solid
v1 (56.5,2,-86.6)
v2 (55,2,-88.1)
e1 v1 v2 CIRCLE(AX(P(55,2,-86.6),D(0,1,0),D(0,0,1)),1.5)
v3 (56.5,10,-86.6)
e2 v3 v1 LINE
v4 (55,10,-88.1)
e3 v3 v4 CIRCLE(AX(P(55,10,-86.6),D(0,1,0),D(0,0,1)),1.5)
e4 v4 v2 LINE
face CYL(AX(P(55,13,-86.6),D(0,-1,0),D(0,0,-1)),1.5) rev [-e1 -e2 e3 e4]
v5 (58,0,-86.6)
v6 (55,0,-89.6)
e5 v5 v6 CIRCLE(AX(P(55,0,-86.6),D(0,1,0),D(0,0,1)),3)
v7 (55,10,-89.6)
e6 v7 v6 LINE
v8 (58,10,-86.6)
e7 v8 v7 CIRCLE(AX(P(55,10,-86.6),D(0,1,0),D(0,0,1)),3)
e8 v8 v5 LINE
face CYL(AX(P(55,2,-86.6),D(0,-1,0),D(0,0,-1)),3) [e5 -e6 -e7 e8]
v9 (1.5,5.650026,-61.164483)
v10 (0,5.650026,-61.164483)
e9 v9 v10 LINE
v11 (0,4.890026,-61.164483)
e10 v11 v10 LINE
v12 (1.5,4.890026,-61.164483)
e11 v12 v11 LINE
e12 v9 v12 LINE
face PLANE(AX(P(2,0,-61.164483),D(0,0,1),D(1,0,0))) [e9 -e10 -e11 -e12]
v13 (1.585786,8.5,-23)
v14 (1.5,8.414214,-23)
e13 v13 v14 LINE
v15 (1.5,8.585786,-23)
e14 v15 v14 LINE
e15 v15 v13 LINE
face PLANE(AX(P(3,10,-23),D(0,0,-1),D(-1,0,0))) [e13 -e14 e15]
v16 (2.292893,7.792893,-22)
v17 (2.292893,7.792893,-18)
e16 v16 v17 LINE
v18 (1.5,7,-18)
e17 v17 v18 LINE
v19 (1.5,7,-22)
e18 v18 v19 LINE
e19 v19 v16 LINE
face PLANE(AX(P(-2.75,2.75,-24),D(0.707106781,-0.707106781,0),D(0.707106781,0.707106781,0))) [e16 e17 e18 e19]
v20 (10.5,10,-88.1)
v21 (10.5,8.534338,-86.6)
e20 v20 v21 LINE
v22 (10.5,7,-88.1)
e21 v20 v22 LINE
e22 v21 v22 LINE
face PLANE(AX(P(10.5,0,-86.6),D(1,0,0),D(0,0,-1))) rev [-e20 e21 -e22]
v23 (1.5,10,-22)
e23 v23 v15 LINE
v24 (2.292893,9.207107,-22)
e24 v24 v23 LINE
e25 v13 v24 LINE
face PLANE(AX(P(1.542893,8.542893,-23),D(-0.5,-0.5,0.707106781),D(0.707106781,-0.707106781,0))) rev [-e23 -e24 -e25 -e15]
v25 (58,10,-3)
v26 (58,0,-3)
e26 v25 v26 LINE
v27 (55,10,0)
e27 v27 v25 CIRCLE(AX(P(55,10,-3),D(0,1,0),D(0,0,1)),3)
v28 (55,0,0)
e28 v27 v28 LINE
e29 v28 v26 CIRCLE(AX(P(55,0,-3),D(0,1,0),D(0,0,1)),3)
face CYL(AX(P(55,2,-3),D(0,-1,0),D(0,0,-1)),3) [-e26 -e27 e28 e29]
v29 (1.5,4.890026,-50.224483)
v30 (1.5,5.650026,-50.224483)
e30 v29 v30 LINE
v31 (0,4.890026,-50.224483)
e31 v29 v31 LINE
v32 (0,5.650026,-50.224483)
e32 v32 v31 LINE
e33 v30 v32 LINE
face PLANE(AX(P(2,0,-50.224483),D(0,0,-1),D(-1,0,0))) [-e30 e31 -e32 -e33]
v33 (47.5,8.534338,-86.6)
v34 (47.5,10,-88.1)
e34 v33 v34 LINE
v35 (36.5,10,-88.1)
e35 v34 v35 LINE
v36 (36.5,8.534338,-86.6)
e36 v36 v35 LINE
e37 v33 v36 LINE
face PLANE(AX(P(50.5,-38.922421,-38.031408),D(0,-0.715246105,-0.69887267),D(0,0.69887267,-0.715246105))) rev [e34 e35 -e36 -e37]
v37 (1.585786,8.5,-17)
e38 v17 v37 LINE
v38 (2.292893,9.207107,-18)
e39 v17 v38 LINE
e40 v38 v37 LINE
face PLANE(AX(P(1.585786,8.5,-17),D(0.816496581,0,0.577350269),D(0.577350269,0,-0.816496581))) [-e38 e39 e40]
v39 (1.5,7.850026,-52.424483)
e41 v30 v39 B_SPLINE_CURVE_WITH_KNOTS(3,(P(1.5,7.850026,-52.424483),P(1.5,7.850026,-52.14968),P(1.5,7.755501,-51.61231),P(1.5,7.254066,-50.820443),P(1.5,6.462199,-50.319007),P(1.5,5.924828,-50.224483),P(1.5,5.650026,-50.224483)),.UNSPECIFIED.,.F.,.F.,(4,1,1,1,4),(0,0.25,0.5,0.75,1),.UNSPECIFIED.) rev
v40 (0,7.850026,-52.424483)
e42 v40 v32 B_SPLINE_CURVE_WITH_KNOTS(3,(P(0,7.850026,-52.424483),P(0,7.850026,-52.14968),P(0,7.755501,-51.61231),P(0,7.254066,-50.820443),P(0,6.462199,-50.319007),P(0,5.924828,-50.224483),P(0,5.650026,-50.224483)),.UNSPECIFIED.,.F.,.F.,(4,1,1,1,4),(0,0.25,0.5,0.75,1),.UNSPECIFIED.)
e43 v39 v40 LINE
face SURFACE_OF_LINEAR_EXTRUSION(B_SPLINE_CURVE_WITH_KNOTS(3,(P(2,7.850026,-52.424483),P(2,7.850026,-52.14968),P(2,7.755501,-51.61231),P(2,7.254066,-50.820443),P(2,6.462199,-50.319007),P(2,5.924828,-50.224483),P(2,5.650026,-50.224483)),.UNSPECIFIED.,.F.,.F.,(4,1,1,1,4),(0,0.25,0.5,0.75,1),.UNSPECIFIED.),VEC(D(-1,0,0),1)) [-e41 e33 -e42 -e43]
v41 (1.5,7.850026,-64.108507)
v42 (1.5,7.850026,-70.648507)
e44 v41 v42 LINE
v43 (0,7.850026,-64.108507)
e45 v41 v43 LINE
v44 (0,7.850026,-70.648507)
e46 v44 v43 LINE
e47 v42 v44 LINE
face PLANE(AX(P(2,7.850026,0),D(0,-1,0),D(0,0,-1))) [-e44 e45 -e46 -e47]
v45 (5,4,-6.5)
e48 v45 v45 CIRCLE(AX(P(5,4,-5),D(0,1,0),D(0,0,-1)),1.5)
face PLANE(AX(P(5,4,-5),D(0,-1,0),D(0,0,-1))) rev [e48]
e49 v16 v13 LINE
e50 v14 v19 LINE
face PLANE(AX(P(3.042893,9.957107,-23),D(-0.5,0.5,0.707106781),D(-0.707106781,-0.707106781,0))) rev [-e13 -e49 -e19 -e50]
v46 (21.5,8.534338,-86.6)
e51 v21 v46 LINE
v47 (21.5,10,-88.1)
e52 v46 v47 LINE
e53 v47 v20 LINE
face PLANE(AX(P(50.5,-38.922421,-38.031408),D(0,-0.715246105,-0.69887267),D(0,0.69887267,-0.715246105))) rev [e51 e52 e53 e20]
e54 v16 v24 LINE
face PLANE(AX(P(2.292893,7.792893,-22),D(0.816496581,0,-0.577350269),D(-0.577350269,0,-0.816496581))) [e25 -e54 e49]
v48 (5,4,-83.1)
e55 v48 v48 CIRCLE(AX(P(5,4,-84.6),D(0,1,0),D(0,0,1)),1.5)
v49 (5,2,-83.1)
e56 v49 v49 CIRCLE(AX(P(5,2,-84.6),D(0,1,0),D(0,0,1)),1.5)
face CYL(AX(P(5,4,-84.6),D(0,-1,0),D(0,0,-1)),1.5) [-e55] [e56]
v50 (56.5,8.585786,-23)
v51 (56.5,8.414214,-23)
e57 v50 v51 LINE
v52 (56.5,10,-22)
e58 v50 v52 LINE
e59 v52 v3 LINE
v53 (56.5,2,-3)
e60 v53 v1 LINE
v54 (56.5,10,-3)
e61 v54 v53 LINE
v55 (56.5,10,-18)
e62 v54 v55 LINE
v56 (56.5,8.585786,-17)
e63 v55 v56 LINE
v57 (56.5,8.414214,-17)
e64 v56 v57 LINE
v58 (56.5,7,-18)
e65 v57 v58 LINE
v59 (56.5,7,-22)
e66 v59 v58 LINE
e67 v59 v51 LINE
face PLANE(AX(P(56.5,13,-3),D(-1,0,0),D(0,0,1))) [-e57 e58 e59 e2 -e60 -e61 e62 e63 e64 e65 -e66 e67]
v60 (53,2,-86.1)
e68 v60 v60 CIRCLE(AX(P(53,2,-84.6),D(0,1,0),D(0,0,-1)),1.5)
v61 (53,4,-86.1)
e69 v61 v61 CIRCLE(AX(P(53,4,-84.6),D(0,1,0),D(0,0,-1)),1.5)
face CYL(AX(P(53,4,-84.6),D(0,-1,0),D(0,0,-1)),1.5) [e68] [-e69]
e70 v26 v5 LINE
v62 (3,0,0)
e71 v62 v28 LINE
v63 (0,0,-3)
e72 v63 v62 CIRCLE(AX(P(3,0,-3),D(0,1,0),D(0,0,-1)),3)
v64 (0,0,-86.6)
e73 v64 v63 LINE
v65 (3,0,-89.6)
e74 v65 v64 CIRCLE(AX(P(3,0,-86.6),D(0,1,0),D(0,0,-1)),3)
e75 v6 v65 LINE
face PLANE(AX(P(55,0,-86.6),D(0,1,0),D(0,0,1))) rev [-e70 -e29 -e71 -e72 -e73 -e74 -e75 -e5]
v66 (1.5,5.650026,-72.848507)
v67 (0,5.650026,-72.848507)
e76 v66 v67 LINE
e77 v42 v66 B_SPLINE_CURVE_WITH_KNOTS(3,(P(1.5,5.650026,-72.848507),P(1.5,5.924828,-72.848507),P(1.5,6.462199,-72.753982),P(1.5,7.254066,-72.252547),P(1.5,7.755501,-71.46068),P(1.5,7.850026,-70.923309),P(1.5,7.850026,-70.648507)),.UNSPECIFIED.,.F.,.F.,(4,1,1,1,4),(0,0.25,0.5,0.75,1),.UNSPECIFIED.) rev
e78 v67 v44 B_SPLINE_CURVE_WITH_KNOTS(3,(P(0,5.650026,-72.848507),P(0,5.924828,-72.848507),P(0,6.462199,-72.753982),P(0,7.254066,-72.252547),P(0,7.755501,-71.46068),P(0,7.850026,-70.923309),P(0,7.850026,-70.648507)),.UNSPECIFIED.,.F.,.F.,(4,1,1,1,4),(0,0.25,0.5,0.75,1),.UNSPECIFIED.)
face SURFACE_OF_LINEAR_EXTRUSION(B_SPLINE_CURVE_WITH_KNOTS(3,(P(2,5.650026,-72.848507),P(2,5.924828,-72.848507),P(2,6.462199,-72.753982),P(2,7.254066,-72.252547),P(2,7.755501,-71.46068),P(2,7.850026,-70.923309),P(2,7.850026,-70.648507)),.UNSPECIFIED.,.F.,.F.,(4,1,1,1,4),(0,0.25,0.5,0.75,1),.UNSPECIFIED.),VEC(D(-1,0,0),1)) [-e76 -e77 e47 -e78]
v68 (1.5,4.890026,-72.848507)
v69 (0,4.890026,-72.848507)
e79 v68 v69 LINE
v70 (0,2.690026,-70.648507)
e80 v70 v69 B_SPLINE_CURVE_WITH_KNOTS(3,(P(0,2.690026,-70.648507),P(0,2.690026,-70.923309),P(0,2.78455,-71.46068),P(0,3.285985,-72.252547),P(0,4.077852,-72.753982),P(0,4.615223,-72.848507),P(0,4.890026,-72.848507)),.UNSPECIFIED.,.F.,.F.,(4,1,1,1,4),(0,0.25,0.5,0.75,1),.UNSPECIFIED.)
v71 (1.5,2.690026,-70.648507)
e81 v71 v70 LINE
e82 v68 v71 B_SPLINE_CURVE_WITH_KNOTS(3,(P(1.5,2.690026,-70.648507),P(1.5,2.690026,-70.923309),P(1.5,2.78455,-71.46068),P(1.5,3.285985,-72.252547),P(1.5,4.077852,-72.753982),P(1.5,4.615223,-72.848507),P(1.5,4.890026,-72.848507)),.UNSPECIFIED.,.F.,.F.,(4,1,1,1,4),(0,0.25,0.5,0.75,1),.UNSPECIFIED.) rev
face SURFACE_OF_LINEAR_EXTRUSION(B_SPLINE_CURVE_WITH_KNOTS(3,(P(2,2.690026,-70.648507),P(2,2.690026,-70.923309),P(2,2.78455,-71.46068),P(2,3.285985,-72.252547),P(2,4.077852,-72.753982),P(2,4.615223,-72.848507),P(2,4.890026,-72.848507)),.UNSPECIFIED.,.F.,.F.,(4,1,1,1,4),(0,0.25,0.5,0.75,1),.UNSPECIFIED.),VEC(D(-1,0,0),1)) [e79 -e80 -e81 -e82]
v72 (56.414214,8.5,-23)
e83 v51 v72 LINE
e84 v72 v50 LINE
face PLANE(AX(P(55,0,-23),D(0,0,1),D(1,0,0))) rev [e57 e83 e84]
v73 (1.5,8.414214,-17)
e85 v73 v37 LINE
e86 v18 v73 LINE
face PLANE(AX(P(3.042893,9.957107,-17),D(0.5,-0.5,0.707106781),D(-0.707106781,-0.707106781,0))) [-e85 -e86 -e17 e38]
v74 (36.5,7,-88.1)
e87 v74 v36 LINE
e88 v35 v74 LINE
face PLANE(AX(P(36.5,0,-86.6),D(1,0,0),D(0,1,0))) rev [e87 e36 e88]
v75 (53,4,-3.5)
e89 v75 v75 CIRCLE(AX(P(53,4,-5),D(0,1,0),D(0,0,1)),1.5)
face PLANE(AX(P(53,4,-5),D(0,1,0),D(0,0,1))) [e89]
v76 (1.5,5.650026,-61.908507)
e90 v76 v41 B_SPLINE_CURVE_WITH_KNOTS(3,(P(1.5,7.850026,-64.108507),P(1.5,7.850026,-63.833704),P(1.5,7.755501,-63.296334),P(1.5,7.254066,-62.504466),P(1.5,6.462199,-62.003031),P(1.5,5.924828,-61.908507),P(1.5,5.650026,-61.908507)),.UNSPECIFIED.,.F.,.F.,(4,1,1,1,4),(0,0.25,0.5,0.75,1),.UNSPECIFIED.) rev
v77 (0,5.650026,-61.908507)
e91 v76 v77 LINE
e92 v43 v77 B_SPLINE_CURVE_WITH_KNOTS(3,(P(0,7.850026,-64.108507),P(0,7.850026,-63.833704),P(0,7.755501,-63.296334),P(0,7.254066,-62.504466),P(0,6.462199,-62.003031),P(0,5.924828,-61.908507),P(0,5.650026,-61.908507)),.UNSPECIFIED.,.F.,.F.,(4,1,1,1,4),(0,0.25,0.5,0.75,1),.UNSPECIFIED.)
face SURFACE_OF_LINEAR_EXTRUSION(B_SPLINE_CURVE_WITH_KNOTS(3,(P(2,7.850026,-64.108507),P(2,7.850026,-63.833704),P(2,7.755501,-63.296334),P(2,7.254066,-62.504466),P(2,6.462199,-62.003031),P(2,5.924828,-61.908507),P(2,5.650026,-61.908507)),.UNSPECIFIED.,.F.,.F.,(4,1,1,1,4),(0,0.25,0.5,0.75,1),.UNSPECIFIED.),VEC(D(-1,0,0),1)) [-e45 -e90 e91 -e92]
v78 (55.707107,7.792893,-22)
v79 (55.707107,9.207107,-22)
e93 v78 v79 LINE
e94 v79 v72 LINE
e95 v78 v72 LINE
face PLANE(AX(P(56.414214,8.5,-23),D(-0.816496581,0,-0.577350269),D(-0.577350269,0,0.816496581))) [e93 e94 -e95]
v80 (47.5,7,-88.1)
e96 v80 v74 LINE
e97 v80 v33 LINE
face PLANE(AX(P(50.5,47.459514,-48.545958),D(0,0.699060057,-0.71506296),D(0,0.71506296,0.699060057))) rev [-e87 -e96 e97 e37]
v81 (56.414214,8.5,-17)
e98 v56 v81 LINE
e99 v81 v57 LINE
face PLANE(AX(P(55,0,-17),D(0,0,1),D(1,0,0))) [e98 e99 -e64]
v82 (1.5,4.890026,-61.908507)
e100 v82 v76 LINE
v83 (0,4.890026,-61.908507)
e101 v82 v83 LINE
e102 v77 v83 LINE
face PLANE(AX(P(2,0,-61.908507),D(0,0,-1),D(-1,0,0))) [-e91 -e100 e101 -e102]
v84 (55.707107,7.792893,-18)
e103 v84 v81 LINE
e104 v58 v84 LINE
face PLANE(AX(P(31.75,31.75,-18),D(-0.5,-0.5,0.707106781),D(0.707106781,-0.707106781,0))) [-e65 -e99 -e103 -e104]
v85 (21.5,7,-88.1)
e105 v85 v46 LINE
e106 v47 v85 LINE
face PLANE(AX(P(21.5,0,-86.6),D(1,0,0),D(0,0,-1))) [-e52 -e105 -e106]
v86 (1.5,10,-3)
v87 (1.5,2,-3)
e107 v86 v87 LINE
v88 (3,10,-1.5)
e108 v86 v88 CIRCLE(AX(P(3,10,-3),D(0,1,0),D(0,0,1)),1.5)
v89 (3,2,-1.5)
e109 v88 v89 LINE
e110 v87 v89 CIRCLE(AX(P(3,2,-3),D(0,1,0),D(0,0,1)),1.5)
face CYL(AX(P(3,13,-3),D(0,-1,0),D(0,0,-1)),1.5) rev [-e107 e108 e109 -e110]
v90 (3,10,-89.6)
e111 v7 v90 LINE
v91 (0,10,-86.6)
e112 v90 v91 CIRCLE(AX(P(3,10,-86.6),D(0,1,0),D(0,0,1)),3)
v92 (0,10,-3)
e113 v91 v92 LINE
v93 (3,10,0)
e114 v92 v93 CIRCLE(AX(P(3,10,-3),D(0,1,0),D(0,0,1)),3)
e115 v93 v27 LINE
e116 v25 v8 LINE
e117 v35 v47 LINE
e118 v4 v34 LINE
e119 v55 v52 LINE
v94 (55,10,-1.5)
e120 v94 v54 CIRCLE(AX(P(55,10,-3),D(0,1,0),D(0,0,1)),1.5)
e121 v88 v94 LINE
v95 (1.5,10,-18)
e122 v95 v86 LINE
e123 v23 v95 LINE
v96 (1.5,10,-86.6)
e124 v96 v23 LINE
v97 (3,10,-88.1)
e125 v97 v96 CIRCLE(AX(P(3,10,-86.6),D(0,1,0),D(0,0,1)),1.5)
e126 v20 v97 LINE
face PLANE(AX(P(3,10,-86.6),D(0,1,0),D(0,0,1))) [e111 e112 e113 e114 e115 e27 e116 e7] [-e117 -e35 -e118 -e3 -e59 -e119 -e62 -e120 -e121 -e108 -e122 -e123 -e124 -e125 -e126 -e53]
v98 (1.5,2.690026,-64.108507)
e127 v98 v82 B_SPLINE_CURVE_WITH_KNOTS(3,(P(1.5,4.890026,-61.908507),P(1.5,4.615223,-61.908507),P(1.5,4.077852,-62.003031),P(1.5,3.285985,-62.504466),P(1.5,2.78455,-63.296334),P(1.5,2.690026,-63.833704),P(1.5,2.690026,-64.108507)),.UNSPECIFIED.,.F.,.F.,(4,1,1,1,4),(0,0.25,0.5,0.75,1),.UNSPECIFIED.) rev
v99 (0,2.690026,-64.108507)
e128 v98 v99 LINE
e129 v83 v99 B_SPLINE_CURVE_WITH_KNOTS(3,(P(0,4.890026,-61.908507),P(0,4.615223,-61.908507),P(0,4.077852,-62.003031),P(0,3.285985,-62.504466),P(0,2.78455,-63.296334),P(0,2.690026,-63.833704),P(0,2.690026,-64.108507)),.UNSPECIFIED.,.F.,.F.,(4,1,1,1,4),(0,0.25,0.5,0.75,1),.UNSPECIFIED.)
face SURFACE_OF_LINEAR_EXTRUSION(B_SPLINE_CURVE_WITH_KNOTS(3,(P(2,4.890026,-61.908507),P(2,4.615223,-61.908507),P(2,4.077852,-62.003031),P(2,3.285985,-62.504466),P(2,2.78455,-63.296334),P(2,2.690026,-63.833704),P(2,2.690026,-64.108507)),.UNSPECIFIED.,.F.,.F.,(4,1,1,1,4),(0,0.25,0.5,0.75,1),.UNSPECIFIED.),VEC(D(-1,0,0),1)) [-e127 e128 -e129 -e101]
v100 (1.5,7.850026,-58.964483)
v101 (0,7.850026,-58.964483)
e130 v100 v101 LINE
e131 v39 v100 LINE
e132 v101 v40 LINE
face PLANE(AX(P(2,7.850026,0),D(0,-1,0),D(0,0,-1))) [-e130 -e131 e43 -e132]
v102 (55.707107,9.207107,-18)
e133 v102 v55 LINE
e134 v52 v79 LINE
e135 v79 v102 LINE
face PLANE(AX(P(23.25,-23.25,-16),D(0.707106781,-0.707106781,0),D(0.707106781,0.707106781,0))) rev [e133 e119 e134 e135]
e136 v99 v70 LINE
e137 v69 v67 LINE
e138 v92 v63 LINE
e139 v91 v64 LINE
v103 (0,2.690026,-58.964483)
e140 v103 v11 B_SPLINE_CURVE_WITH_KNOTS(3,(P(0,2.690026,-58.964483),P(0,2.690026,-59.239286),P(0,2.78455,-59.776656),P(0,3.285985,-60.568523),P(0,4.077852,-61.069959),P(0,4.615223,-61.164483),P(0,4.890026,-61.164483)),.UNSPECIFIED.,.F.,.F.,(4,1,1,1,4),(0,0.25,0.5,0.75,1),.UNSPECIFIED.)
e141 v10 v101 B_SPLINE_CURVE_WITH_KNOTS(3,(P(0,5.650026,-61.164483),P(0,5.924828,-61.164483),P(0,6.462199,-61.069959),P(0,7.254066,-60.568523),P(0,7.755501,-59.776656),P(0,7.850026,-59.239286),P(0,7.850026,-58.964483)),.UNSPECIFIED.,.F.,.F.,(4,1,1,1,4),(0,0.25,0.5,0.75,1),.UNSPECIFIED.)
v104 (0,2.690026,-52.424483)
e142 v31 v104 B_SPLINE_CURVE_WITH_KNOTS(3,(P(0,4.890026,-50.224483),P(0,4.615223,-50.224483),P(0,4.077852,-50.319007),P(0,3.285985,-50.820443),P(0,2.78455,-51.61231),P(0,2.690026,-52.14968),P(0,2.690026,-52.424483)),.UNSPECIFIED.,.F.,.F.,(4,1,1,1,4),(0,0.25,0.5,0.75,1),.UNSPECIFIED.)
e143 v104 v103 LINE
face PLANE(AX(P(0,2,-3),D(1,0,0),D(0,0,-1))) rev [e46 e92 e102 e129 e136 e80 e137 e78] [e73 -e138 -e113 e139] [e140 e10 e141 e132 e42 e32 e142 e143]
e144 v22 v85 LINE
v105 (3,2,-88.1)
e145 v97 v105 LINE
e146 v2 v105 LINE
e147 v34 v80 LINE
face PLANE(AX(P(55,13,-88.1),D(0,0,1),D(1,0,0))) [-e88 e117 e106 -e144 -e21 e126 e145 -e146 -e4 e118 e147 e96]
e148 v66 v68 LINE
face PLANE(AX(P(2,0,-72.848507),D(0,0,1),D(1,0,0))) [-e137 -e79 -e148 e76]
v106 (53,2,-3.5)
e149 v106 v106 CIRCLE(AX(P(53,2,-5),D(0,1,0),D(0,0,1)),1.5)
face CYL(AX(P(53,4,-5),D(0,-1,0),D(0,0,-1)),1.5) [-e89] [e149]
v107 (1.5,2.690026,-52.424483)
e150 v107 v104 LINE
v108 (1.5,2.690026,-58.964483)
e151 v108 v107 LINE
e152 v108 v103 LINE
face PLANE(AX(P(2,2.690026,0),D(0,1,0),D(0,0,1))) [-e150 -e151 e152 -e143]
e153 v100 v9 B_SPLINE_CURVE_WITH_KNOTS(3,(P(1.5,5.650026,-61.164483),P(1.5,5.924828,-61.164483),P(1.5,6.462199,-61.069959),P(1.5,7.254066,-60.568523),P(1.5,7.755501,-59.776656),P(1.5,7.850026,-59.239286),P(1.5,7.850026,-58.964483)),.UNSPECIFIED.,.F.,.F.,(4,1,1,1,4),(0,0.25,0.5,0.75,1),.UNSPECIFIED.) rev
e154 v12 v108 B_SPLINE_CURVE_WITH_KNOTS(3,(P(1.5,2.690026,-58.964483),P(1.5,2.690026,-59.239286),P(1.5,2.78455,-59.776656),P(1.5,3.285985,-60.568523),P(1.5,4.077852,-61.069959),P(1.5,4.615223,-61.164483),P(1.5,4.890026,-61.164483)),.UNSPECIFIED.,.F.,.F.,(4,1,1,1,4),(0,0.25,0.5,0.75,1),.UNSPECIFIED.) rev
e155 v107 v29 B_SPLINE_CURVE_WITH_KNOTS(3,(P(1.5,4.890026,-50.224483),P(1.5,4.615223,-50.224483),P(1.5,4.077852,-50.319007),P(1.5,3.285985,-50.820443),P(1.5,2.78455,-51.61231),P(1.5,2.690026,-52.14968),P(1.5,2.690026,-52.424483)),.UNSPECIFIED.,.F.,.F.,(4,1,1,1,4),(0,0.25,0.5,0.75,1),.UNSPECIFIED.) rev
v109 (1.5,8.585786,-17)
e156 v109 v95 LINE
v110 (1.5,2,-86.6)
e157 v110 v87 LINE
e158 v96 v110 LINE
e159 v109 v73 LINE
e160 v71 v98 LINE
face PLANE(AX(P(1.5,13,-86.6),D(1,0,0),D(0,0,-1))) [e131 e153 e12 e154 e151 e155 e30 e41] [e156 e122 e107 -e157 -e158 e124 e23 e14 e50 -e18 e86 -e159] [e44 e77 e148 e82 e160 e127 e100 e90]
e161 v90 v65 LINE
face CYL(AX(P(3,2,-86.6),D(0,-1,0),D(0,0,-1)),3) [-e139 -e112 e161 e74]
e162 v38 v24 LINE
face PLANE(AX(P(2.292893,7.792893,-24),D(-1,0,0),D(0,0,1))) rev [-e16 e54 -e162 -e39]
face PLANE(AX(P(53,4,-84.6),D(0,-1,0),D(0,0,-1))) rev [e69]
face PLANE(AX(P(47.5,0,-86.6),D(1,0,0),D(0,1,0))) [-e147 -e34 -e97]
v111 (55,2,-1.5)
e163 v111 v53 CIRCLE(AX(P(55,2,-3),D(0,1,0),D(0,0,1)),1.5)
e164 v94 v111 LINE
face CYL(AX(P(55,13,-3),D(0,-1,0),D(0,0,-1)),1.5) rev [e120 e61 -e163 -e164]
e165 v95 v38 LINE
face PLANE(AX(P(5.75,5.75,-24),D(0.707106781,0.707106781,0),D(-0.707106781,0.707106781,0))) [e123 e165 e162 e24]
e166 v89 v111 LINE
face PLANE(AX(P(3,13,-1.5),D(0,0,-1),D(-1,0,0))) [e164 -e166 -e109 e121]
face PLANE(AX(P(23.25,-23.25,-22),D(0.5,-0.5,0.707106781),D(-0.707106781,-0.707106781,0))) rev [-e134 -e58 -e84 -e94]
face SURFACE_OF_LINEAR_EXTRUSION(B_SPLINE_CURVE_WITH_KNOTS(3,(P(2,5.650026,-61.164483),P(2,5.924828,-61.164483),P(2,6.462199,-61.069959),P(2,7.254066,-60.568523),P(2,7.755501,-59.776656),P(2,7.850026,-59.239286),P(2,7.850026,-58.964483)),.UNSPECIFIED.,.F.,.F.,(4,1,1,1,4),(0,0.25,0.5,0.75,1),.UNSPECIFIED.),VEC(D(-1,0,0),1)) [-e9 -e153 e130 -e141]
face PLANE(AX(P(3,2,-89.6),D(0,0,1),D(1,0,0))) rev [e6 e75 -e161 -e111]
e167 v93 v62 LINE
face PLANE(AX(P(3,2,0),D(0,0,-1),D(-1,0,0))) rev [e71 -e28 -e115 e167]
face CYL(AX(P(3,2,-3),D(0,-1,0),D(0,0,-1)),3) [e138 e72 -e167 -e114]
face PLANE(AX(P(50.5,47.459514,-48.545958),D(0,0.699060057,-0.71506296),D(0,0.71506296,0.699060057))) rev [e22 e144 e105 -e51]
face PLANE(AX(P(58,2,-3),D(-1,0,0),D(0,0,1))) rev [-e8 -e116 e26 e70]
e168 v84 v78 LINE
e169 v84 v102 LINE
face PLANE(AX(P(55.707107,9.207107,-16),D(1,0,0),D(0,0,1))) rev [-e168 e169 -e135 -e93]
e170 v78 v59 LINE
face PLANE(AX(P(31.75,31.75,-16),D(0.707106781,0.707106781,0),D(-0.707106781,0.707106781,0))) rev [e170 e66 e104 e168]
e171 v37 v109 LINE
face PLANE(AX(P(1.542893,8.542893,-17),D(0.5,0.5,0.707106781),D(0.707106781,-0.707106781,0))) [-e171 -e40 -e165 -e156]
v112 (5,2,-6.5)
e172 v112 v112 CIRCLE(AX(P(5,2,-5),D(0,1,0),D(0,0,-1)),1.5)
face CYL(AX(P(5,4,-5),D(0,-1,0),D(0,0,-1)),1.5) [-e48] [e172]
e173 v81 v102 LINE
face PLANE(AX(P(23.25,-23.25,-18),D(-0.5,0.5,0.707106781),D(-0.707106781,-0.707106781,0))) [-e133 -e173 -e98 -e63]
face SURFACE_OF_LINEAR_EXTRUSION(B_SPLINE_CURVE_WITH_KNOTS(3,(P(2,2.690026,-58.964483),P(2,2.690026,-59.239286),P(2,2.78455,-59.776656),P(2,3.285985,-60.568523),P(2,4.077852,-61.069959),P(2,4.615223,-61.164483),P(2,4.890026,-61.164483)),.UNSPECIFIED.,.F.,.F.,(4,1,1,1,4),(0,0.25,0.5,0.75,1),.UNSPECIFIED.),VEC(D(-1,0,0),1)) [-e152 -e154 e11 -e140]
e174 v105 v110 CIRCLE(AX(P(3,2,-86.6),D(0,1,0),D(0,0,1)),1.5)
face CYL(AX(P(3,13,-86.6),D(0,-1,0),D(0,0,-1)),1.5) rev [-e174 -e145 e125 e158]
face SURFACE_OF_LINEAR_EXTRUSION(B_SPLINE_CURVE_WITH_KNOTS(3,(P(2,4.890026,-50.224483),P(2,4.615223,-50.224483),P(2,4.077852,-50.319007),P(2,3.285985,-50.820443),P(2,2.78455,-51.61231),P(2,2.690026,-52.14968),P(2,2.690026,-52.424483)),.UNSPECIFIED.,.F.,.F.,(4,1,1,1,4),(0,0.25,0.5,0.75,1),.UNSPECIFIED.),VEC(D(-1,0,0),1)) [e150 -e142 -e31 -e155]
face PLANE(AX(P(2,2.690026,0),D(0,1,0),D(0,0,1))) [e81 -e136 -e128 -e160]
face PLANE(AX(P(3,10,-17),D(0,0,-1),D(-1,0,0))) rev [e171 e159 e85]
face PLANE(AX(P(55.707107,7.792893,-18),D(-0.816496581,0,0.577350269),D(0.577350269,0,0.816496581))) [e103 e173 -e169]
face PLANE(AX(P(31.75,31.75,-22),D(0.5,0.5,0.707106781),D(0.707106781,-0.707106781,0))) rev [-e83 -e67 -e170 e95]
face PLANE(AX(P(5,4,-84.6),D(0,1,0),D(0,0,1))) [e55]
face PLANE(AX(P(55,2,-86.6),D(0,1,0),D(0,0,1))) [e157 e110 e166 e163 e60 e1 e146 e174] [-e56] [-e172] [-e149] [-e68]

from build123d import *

# Parameters (mm, degrees)
EXTRUDE_1_DEPTH     = 2
EXTRUDE_2_DEPTH     = 11
SKETCH_5_R          = 1.5
EXTRUDE_3_DEPTH     = 2
CUT_EXTRUDE_START   = -3
CUT_EXTRUDE_2_DEPTH = 3
SKETCH_8_W          = 11
SKETCH_8_H          = 3
EXTRUDE_4_DEPTH     = 1.5
CUT_EXTRUDE_3_DEPTH = 40
SKETCH_11_W         = 6
SKETCH_11_H         = 3
EXTRUDE_5_DEPTH     = 1.5
CUT_EXTRUDE_4_DEPTH = 7
SKETCH_13_W         = 6
SKETCH_13_H         = 3
EXTRUDE_6_DEPTH     = 1.5
CUT_EXTRUDE_5_DEPTH = 7
CHAMFER_1_SIZE      = 1
CHAMFER_2_SIZE      = 1
CUT_EXTRUDE_6_DEPTH = 2


with BuildPart() as part:
    # 草图1 → 凸台-拉伸1 (new body)
    with BuildSketch(Plane(origin=(0, 0, 0), x_dir=(1, 0, 0), z_dir=(0, 1, 0))):
        with BuildLine():
            Line((3, 0), (55, 0))
            ThreePointArc((55, 0), (57.121320344, 0.878679656), (58, 3))
            Line((58, 3), (58, 86.6))
            ThreePointArc((58, 86.6), (57.121320344, 88.721320344), (55, 89.6))
            Line((55, 89.6), (3, 89.6))
            ThreePointArc((3, 89.6), (0.878679656, 88.721320344), (0, 86.6))
            Line((0, 86.6), (0, 3))
            ThreePointArc((0, 3), (0.878679656, 0.878679656), (3, 0))
        make_face()
    extrude(amount=EXTRUDE_1_DEPTH)

    # 草图3 → 凸台-拉伸2 (add)
    with BuildSketch(Plane(origin=(0, 2, 0), x_dir=(1, 0, 0), z_dir=(0, 1, 0))):
        with BuildLine():
            Line((0, 86.6), (0, 3))
            ThreePointArc((0, 3), (0.878679656, 0.878679656), (3, 0))
            Line((3, 0), (55, 0))
            ThreePointArc((55, 0), (57.121320344, 0.878679656), (58, 3))
            Line((58, 3), (58, 86.6))
            ThreePointArc((58, 86.6), (57.121320344, 88.721320344), (55, 89.6))
            Line((55, 89.6), (3, 89.6))
            ThreePointArc((3, 89.6), (0.878679656, 88.721320344), (0, 86.6))
        make_face()
        with BuildLine():
            Line((1.5, 86.6), (1.5, 3))
            ThreePointArc((1.5, 3), (1.939339828, 1.939339828), (3, 1.5))
            Line((3, 1.5), (55, 1.5))
            ThreePointArc((55, 1.5), (56.060660172, 1.939339828), (56.5, 3))
            Line((56.5, 3), (56.5, 86.6))
            ThreePointArc((56.5, 86.6), (56.060660172, 87.660660172), (55, 88.1))
            Line((55, 88.1), (3, 88.1))
            ThreePointArc((3, 88.1), (1.939339828, 87.660660172), (1.5, 86.6))
        make_face(mode=Mode.SUBTRACT)
    extrude(amount=EXTRUDE_2_DEPTH)

    # 草图5 → 凸台-拉伸3 (add)
    with BuildSketch(Plane(origin=(0, 2, 0), x_dir=(1, 0, 0), z_dir=(0, 1, 0))):
        with Locations(Location((5, 84.6, 0), (0, 0, 270))):
            Circle(SKETCH_5_R)
        with Locations(Location((53, 84.6, 0), (0, 0, 90))):
            Circle(SKETCH_5_R)
        with Locations(Location((53, 5, 0), (0, 0, 270))):
            Circle(SKETCH_5_R)
        with Locations(Location((5, 5, 0), (0, 0, 90))):
            Circle(SKETCH_5_R)
    extrude(amount=EXTRUDE_3_DEPTH)

    # 草图7 → 切除-拉伸2 (cut)
    with BuildSketch(Plane(origin=(0, 13, 0), x_dir=(1, 0, 0), z_dir=(0, 1, 0)).offset(CUT_EXTRUDE_START)):
        with BuildLine():
            Line((0, 86.6), (0, 3))
            ThreePointArc((0, 3), (0.878679656, 0.878679656), (3, 0))
            Line((3, 0), (55, 0))
            ThreePointArc((55, 0), (57.121320344, 0.878679656), (58, 3))
            Line((58, 3), (58, 86.6))
            ThreePointArc((58, 86.6), (57.121320344, 88.721320344), (55, 89.6))
            Line((55, 89.6), (3, 89.6))
            ThreePointArc((3, 89.6), (0.878679656, 88.721320344), (0, 86.6))
        make_face()
        with BuildLine():
            Line((3, 1.5), (55, 1.5))
            ThreePointArc((55, 1.5), (56.060660172, 1.939339828), (56.5, 3))
            Line((56.5, 3), (56.5, 86.6))
            ThreePointArc((56.5, 86.6), (56.060660172, 87.660660172), (55, 88.1))
            Line((55, 88.1), (3, 88.1))
            ThreePointArc((3, 88.1), (1.939339828, 87.660660172), (1.5, 86.6))
            Line((1.5, 86.6), (1.5, 3))
            ThreePointArc((1.5, 3), (1.939339828, 1.939339828), (3, 1.5))
        make_face(mode=Mode.SUBTRACT)
    extrude(amount=CUT_EXTRUDE_2_DEPTH, mode=Mode.SUBTRACT)

    # 草图8 → 凸台-拉伸4 (add)
    with BuildSketch(Plane.XY.offset(-88.1)):
        with Locations((16, 8.5)):
            Rectangle(SKETCH_8_W, SKETCH_8_H)
        with Locations((42, 8.5)):
            Rectangle(SKETCH_8_W, SKETCH_8_H)
    extrude(amount=EXTRUDE_4_DEPTH)

    # 草图10 → 切除-拉伸3 (cut)
    with BuildSketch(Plane.ZY.offset(-10.5)):
        Polygon((-86.6, 10), (-88.1, 10), (-86.6, 8.534338043), align=None)
        Polygon((-86.6, 7), (-86.6, 8.534338043), (-88.1, 7), align=None)
    extrude(amount=-CUT_EXTRUDE_3_DEPTH, mode=Mode.SUBTRACT)

    # 草图11 → 凸台-拉伸5 (add)
    with BuildSketch(Plane(origin=(1.5, 0, 0), x_dir=(0, 0, -1), z_dir=(1, 0, 0))):
        with Locations((20, 8.5)):
            Rectangle(SKETCH_11_W, SKETCH_11_H)
    extrude(amount=EXTRUDE_5_DEPTH)

    # 草图12 → 切除-拉伸4 (cut)
    with BuildSketch(Plane.XY.offset(-17)):
        Polygon((1.5, 10), (3, 8.5), (3, 10), align=None)
        Polygon((3, 7), (3, 8.5), (1.5, 7), align=None)
    extrude(amount=-CUT_EXTRUDE_4_DEPTH, mode=Mode.SUBTRACT)

    # 草图13 → 凸台-拉伸6 (add)
    with BuildSketch(Plane.ZY.offset(-56.5)):
        with Locations((-20, 8.5)):
            Rectangle(SKETCH_13_W, SKETCH_13_H)
    extrude(amount=EXTRUDE_6_DEPTH)

    # 草图15 → 切除-拉伸5 (cut)
    with BuildSketch(Plane(origin=(0, 0, -23), x_dir=(-1, 0, 0), z_dir=(0, 0, -1))):
        Polygon((-55, 10), (-56.5, 10), (-55, 8.5), align=None)
        Polygon((-55, 7), (-55, 8.5), (-56.5, 7), align=None)
    extrude(amount=-CUT_EXTRUDE_5_DEPTH, mode=Mode.SUBTRACT)

    # 倒角1
    # the kernel refuses this chamfer: 1 mm, written as the material it takes off along each edge
    with BuildSketch(Plane(origin=(2.057190958, 8.5, -17.666666667), x_dir=(0, -1, 0), z_dir=(0.816496580927726, 0, 0.5773502691896257)), Plane(origin=(2.057190958, 8.5, -22.333333333), x_dir=(-0.5, -0.4999999999999994, -0.707106781186548), z_dir=(0.816496580927726, 0, -0.5773502691896257))) as chamfer_1_piece_1:
        Polygon((-0.707106781, 0.40824829), (0.707106781, 0.40824829), (0, -0.816496581), align=None)
    extrude(amount=1.270170592, mode=Mode.SUBTRACT)
    with BuildSketch(Plane(origin=(3, 8.5, -14.428317012), x_dir=(-0.6873969152646603, 0.7262819568766866, 0), z_dir=(0, 0, -1))) as chamfer_1_piece_2:
        Polygon((CHAMFER_1_SIZE * 0.999621916911, -CHAMFER_1_SIZE * 0.0274958766106), (-CHAMFER_1_SIZE * 0.0274958766106, -CHAMFER_1_SIZE * 0.999621916911), (0, 0), align=None)
    extrude(amount=11.143365976, mode=Mode.SUBTRACT)
    with BuildSketch(Plane(origin=(4.81845448, 6.68154552, -23), x_dir=(0.019442520806014225, 0.019442520806014253, 0.9996219169112968), z_dir=(-0.707106781186548, 0.7071067811865471, 0))) as chamfer_1_piece_3_section:
        Polygon((CHAMFER_1_SIZE * 0.999621916911, -CHAMFER_1_SIZE * 0.0274958766106), (-CHAMFER_1_SIZE * 0.0274958766106, -CHAMFER_1_SIZE * 0.999621916911), (0, 0), align=None)
    chamfer_1_piece_3 = extrude(amount=7.264686319, mode=Mode.PRIVATE)
    chamfer_1_piece_3 = split(chamfer_1_piece_3, bisect_by=Plane(origin=(1.5, 8.929402981, -22.651130884), z_dir=(1, 0, 0)), keep=Keep.TOP, mode=Mode.PRIVATE)
    add(chamfer_1_piece_3, mode=Mode.SUBTRACT)
    with BuildSketch(Plane(origin=(-0.31845448, 11.81845448, -17), x_dir=(0.019442520806013688, 0.01944252080601371, -0.9996219169112968), z_dir=(0.707106781186548, -0.7071067811865471, 0))) as chamfer_1_piece_4_section:
        Polygon((CHAMFER_1_SIZE * 0.999621916911, -CHAMFER_1_SIZE * 0.0274958766106), (-CHAMFER_1_SIZE * 0.0274958766106, -CHAMFER_1_SIZE * 0.999621916911), (0, 0), align=None)
    chamfer_1_piece_4 = extrude(amount=7.264686319, mode=Mode.PRIVATE)
    chamfer_1_piece_4 = split(chamfer_1_piece_4, bisect_by=Plane(origin=(1.5, 8.929402981, -17.348869116), z_dir=(1, 0, 0)), keep=Keep.TOP, mode=Mode.PRIVATE)
    add(chamfer_1_piece_4, mode=Mode.SUBTRACT)
    with BuildSketch(Plane(origin=(-0.31845448, 5.18154552, -23), x_dir=(-0.7068394360706733, 0.7068394360706738, -0.027495876610585633), z_dir=(0.7071067811865477, 0.7071067811865474, 0))) as chamfer_1_piece_5_section:
        Polygon((CHAMFER_1_SIZE * 0.999621916911, CHAMFER_1_SIZE * 0.0274958766106), (-CHAMFER_1_SIZE * 0.0274958766106, CHAMFER_1_SIZE * 0.999621916911), (0, 0), align=None)
    chamfer_1_piece_5 = extrude(amount=7.264686319, mode=Mode.PRIVATE)
    chamfer_1_piece_5 = split(chamfer_1_piece_5, bisect_by=Plane(origin=(1.5, 8.070597019, -22.651130884), z_dir=(1, 0, 0)), keep=Keep.TOP, mode=Mode.PRIVATE)
    add(chamfer_1_piece_5, mode=Mode.SUBTRACT)
    with BuildSketch(Plane(origin=(4.81845448, 10.31845448, -17), x_dir=(0.019442520806014236, -0.019442520806014243, -0.9996219169112968), z_dir=(-0.7071067811865477, -0.7071067811865474, 0))) as chamfer_1_piece_6_section:
        Polygon((CHAMFER_1_SIZE * 0.999621916911, -CHAMFER_1_SIZE * 0.0274958766106), (-CHAMFER_1_SIZE * 0.0274958766106, -CHAMFER_1_SIZE * 0.999621916911), (0, 0), align=None)
    chamfer_1_piece_6 = extrude(amount=7.264686319, mode=Mode.PRIVATE)
    chamfer_1_piece_6 = split(chamfer_1_piece_6, bisect_by=Plane(origin=(1.5, 8.070597019, -17.348869116), z_dir=(1, 0, 0)), keep=Keep.TOP, mode=Mode.PRIVATE)
    add(chamfer_1_piece_6, mode=Mode.SUBTRACT)

    # 倒角2
    # the kernel refuses this chamfer: 1 mm, written as the material it takes off along each edge
    with BuildSketch(Plane(origin=(55.942809042, 8.5, -22.333333333), x_dir=(0, -1, 0), z_dir=(-0.8164965809277266, 0, -0.577350269189625)), Plane(origin=(55.942809042, 8.5, -17.666666667), x_dir=(0.49999999999999983, -0.4999999999999986, 0.7071067811865487), z_dir=(-0.8164965809277266, 0, 0.577350269189625))) as chamfer_2_piece_1:
        Polygon((-0.707106781, 0.40824829), (0.707106781, 0.40824829), (0, -0.816496581), align=None)
    extrude(amount=1.270170592, mode=Mode.SUBTRACT)
    with BuildSketch(Plane(origin=(55, 8.5, -25.571682988), x_dir=(0.6873969152646596, 0.7262819568766873, 0), z_dir=(0, 0, 1))) as chamfer_2_piece_2:
        Polygon((CHAMFER_2_SIZE * 0.999621916911, -CHAMFER_2_SIZE * 0.0274958766106), (-CHAMFER_2_SIZE * 0.0274958766106, -CHAMFER_2_SIZE * 0.999621916911), (0, 0), align=None)
    extrude(amount=11.143365976, mode=Mode.SUBTRACT)
    with BuildSketch(Plane(origin=(58.31845448, 11.81845448, -17), x_dir=(-0.01944252080601641, 0.019442520806016383, -0.9996219169112968), z_dir=(-0.7071067811865471, -0.707106781186548, 0))) as chamfer_2_piece_3_section:
        Polygon((CHAMFER_2_SIZE * 0.999621916911, CHAMFER_2_SIZE * 0.0274958766106), (-CHAMFER_2_SIZE * 0.0274958766106, CHAMFER_2_SIZE * 0.999621916911), (0, 0), align=None)
    chamfer_2_piece_3 = extrude(amount=7.264686319, mode=Mode.PRIVATE)
    chamfer_2_piece_3 = split(chamfer_2_piece_3, bisect_by=Plane(origin=(56.5, 8.929402981, -17.348869116), z_dir=(-1, 0, 0)), keep=Keep.TOP, mode=Mode.PRIVATE)
    add(chamfer_2_piece_3, mode=Mode.SUBTRACT)
    with BuildSketch(Plane(origin=(58.31845448, 11.81845448, -23), x_dir=(-0.01944252080601382, 0.019442520806013795, 0.9996219169112968), z_dir=(-0.7071067811865471, -0.707106781186548, 0))) as chamfer_2_piece_4_section:
        Polygon((CHAMFER_2_SIZE * 0.999621916911, -CHAMFER_2_SIZE * 0.0274958766106), (-CHAMFER_2_SIZE * 0.0274958766106, -CHAMFER_2_SIZE * 0.999621916911), (0, 0), align=None)
    chamfer_2_piece_4 = extrude(amount=7.264686319, mode=Mode.PRIVATE)
    chamfer_2_piece_4 = split(chamfer_2_piece_4, bisect_by=Plane(origin=(56.5, 8.929402981, -22.651130884), z_dir=(-1, 0, 0)), keep=Keep.TOP, mode=Mode.PRIVATE)
    add(chamfer_2_piece_4, mode=Mode.SUBTRACT)
    with BuildSketch(Plane(origin=(53.18154552, 10.31845448, -17), x_dir=(0.706839436070674, 0.7068394360706731, 0.0274958766105856), z_dir=(0.7071067811865471, -0.707106781186548, 0))) as chamfer_2_piece_5_section:
        Polygon((CHAMFER_2_SIZE * 0.999621916911, -CHAMFER_2_SIZE * 0.0274958766106), (-CHAMFER_2_SIZE * 0.0274958766106, -CHAMFER_2_SIZE * 0.999621916911), (0, 0), align=None)
    chamfer_2_piece_5 = extrude(amount=7.264686319, mode=Mode.PRIVATE)
    chamfer_2_piece_5 = split(chamfer_2_piece_5, bisect_by=Plane(origin=(56.5, 8.070597019, -17.348869116), z_dir=(-1, 0, 0)), keep=Keep.TOP, mode=Mode.PRIVATE)
    add(chamfer_2_piece_5, mode=Mode.SUBTRACT)
    with BuildSketch(Plane(origin=(53.18154552, 10.31845448, -23), x_dir=(-0.01944252080601641, -0.019442520806016383, 0.9996219169112968), z_dir=(0.7071067811865471, -0.707106781186548, 0))) as chamfer_2_piece_6_section:
        Polygon((CHAMFER_2_SIZE * 0.999621916911, -CHAMFER_2_SIZE * 0.0274958766106), (-CHAMFER_2_SIZE * 0.0274958766106, -CHAMFER_2_SIZE * 0.999621916911), (0, 0), align=None)
    chamfer_2_piece_6 = extrude(amount=7.264686319, mode=Mode.PRIVATE)
    chamfer_2_piece_6 = split(chamfer_2_piece_6, bisect_by=Plane(origin=(56.5, 8.070597019, -22.651130884), z_dir=(-1, 0, 0)), keep=Keep.TOP, mode=Mode.PRIVATE)
    add(chamfer_2_piece_6, mode=Mode.SUBTRACT)

    # 草图16 → 切除-拉伸6 (cut)
    # profile 1 of 4: a face of its own
    with BuildSketch(Plane(origin=(0, 2, -82.999537719), x_dir=(0, 1, 0), z_dir=(-1, 0, 0))):
        with BuildLine():
            add(Edge.make_bspline(
                [(3.650025513, -10.151031112), (3.92482832, -10.151031112), (4.462198601, -10.245555275), (5.25406566, -10.746990965), (5.755501349, -11.538858023), (5.850025513, -12.076228304), (5.850025513, -12.351031112)],
                knots=[0, 0, 0, 0, 0.25, 0.5, 0.75, 1, 1, 1, 1], degree=3))
            Line((5.850025513, -12.351031112), (5.850025513, -18.891031112))
            add(Edge.make_bspline(
                [(5.850025513, -18.891031112), (5.850025513, -19.165833919), (5.755501349, -19.7032042), (5.25406566, -20.495071258), (4.462198601, -20.996506948), (3.92482832, -21.091031112), (3.650025513, -21.091031112)],
                knots=[0, 0, 0, 0, 0.25, 0.5, 0.75, 1, 1, 1, 1], degree=3))
            Line((3.650025513, -21.091031112), (2.890025513, -21.091031112))
            add(Edge.make_bspline(
                [(2.890025513, -21.091031112), (2.615222706, -21.091031112), (2.077852425, -20.996506948), (1.285985366, -20.495071258), (0.784549677, -19.7032042), (0.690025513, -19.165833919), (0.690025513, -18.891031112)],
                knots=[0, 0, 0, 0, 0.25, 0.5, 0.75, 1, 1, 1, 1], degree=3))
            Line((0.690025513, -18.891031112), (0.690025513, -12.351031112))
            add(Edge.make_bspline(
                [(0.690025513, -12.351031112), (0.690025513, -12.076228304), (0.784549677, -11.538858023), (1.285985366, -10.746990965), (2.077852425, -10.245555275), (2.615222706, -10.151031112), (2.890025513, -10.151031112)],
                knots=[0, 0, 0, 0, 0.25, 0.5, 0.75, 1, 1, 1, 1], degree=3))
            Line((2.890025513, -10.151031112), (3.650025513, -10.151031112))
        make_face()
        with BuildLine():
            Line((2.890025513, -11.151031112), (3.650025513, -11.151031112))
            add(Edge.make_bspline(
                [(3.650025513, -11.151031112), (4.352969238, -11.151031112), (4.850025513, -11.648087386), (4.850025513, -12.351031112)],
                knots=[0, 0, 0, 0, 1, 1, 1, 1], degree=3, weights=[1, 0.804737854, 0.804737854, 1]))
            Line((4.850025513, -12.351031112), (4.850025513, -18.891031112))
            add(Edge.make_bspline(
                [(4.850025513, -18.891031112), (4.850025513, -19.593974837), (4.352969238, -20.091031112), (3.650025513, -20.091031112)],
                knots=[0, 0, 0, 0, 1, 1, 1, 1], degree=3, weights=[1, 0.804737854, 0.804737854, 1]))
            Line((3.650025513, -20.091031112), (2.890025513, -20.091031112))
            add(Edge.make_bspline(
                [(2.890025513, -20.091031112), (2.187081788, -20.091031112), (1.690025513, -19.593974837), (1.690025513, -18.891031112)],
                knots=[0, 0, 0, 0, 1, 1, 1, 1], degree=3, weights=[1, 0.804737854, 0.804737854, 1]))
            Line((1.690025513, -18.891031112), (1.690025513, -12.351031112))
            add(Edge.make_bspline(
                [(1.690025513, -12.351031112), (1.690025513, -11.648087386), (2.187081788, -11.151031112), (2.890025513, -11.151031112)],
                knots=[0, 0, 0, 0, 1, 1, 1, 1], degree=3, weights=[1, 0.804737854, 0.804737854, 1]))
        make_face(mode=Mode.SUBTRACT)
    # profile 2 of 4: a face of its own
    with BuildSketch(Plane(origin=(0, 2, -82.999537719), x_dir=(0, 1, 0), z_dir=(-1, 0, 0))):
        with BuildLine():
            add(Edge.make_bspline(
                [(3.650025513, -11.151031112), (4.352969238, -11.151031112), (4.850025513, -11.648087386), (4.850025513, -12.351031112)],
                knots=[0, 0, 0, 0, 1, 1, 1, 1], degree=3, weights=[1, 0.804737854, 0.804737854, 1]))
            Line((4.850025513, -12.351031112), (4.850025513, -18.891031112))
            add(Edge.make_bspline(
                [(4.850025513, -18.891031112), (4.850025513, -19.593974837), (4.352969238, -20.091031112), (3.650025513, -20.091031112)],
                knots=[0, 0, 0, 0, 1, 1, 1, 1], degree=3, weights=[1, 0.804737854, 0.804737854, 1]))
            Line((3.650025513, -20.091031112), (2.890025513, -20.091031112))
            add(Edge.make_bspline(
                [(2.890025513, -20.091031112), (2.187081788, -20.091031112), (1.690025513, -19.593974837), (1.690025513, -18.891031112)],
                knots=[0, 0, 0, 0, 1, 1, 1, 1], degree=3, weights=[1, 0.804737854, 0.804737854, 1]))
            Line((1.690025513, -18.891031112), (1.690025513, -12.351031112))
            add(Edge.make_bspline(
                [(1.690025513, -12.351031112), (1.690025513, -11.648087386), (2.187081788, -11.151031112), (2.890025513, -11.151031112)],
                knots=[0, 0, 0, 0, 1, 1, 1, 1], degree=3, weights=[1, 0.804737854, 0.804737854, 1]))
            Line((2.890025513, -11.151031112), (3.650025513, -11.151031112))
        make_face()
    # profile 3 of 4: a face of its own
    with BuildSketch(Plane(origin=(0, 2, -82.999537719), x_dir=(0, 1, 0), z_dir=(-1, 0, 0))):
        with BuildLine():
            add(Edge.make_bspline(
                [(3.650025513, -21.83505448), (3.92482832, -21.83505448), (4.462198601, -21.929578643), (5.25406566, -22.431014333), (5.755501349, -23.222881391), (5.850025513, -23.760251672), (5.850025513, -24.03505448)],
                knots=[0, 0, 0, 0, 0.25, 0.5, 0.75, 1, 1, 1, 1], degree=3))
            Line((5.850025513, -24.03505448), (5.850025513, -30.57505448))
            add(Edge.make_bspline(
                [(5.850025513, -30.57505448), (5.850025513, -30.849857287), (5.755501349, -31.387227568), (5.25406566, -32.179094626), (4.462198601, -32.680530316), (3.92482832, -32.77505448), (3.650025513, -32.77505448)],
                knots=[0, 0, 0, 0, 0.25, 0.5, 0.75, 1, 1, 1, 1], degree=3))
            Line((3.650025513, -32.77505448), (2.890025513, -32.77505448))
            add(Edge.make_bspline(
                [(2.890025513, -32.77505448), (2.615222706, -32.77505448), (2.077852425, -32.680530316), (1.285985366, -32.179094626), (0.784549677, -31.387227568), (0.690025513, -30.849857287), (0.690025513, -30.57505448)],
                knots=[0, 0, 0, 0, 0.25, 0.5, 0.75, 1, 1, 1, 1], degree=3))
            Line((0.690025513, -30.57505448), (0.690025513, -24.03505448))
            add(Edge.make_bspline(
                [(0.690025513, -24.03505448), (0.690025513, -23.760251672), (0.784549677, -23.222881391), (1.285985366, -22.431014333), (2.077852425, -21.929578643), (2.615222706, -21.83505448), (2.890025513, -21.83505448)],
                knots=[0, 0, 0, 0, 0.25, 0.5, 0.75, 1, 1, 1, 1], degree=3))
            Line((2.890025513, -21.83505448), (3.650025513, -21.83505448))
        make_face()
        with BuildLine():
            Line((2.890025513, -22.83505448), (3.650025513, -22.83505448))
            add(Edge.make_bspline(
                [(3.650025513, -22.83505448), (4.352969238, -22.83505448), (4.850025513, -23.332110755), (4.850025513, -24.03505448)],
                knots=[0, 0, 0, 0, 1, 1, 1, 1], degree=3, weights=[1, 0.804737854, 0.804737854, 1]))
            Line((4.850025513, -24.03505448), (4.850025513, -30.57505448))
            add(Edge.make_bspline(
                [(4.850025513, -30.57505448), (4.850025513, -31.277998205), (4.352969238, -31.77505448), (3.650025513, -31.77505448)],
                knots=[0, 0, 0, 0, 1, 1, 1, 1], degree=3, weights=[1, 0.804737854, 0.804737854, 1]))
            Line((3.650025513, -31.77505448), (2.890025513, -31.77505448))
            add(Edge.make_bspline(
                [(2.890025513, -31.77505448), (2.187081788, -31.77505448), (1.690025513, -31.277998205), (1.690025513, -30.57505448)],
                knots=[0, 0, 0, 0, 1, 1, 1, 1], degree=3, weights=[1, 0.804737854, 0.804737854, 1]))
            Line((1.690025513, -30.57505448), (1.690025513, -24.03505448))
            add(Edge.make_bspline(
                [(1.690025513, -24.03505448), (1.690025513, -23.332110755), (2.187081788, -22.83505448), (2.890025513, -22.83505448)],
                knots=[0, 0, 0, 0, 1, 1, 1, 1], degree=3, weights=[1, 0.804737854, 0.804737854, 1]))
        make_face(mode=Mode.SUBTRACT)
    # profile 4 of 4: a face of its own
    with BuildSketch(Plane(origin=(0, 2, -82.999537719), x_dir=(0, 1, 0), z_dir=(-1, 0, 0))):
        with BuildLine():
            add(Edge.make_bspline(
                [(3.650025513, -22.83505448), (4.352969238, -22.83505448), (4.850025513, -23.332110755), (4.850025513, -24.03505448)],
                knots=[0, 0, 0, 0, 1, 1, 1, 1], degree=3, weights=[1, 0.804737854, 0.804737854, 1]))
            Line((4.850025513, -24.03505448), (4.850025513, -30.57505448))
            add(Edge.make_bspline(
                [(4.850025513, -30.57505448), (4.850025513, -31.277998205), (4.352969238, -31.77505448), (3.650025513, -31.77505448)],
                knots=[0, 0, 0, 0, 1, 1, 1, 1], degree=3, weights=[1, 0.804737854, 0.804737854, 1]))
            Line((3.650025513, -31.77505448), (2.890025513, -31.77505448))
            add(Edge.make_bspline(
                [(2.890025513, -31.77505448), (2.187081788, -31.77505448), (1.690025513, -31.277998205), (1.690025513, -30.57505448)],
                knots=[0, 0, 0, 0, 1, 1, 1, 1], degree=3, weights=[1, 0.804737854, 0.804737854, 1]))
            Line((1.690025513, -30.57505448), (1.690025513, -24.03505448))
            add(Edge.make_bspline(
                [(1.690025513, -24.03505448), (1.690025513, -23.332110755), (2.187081788, -22.83505448), (2.890025513, -22.83505448)],
                knots=[0, 0, 0, 0, 1, 1, 1, 1], degree=3, weights=[1, 0.804737854, 0.804737854, 1]))
            Line((2.890025513, -22.83505448), (3.650025513, -22.83505448))
        make_face()
    extrude(amount=-CUT_EXTRUDE_6_DEPTH, mode=Mode.SUBTRACT)


solid = part.part
